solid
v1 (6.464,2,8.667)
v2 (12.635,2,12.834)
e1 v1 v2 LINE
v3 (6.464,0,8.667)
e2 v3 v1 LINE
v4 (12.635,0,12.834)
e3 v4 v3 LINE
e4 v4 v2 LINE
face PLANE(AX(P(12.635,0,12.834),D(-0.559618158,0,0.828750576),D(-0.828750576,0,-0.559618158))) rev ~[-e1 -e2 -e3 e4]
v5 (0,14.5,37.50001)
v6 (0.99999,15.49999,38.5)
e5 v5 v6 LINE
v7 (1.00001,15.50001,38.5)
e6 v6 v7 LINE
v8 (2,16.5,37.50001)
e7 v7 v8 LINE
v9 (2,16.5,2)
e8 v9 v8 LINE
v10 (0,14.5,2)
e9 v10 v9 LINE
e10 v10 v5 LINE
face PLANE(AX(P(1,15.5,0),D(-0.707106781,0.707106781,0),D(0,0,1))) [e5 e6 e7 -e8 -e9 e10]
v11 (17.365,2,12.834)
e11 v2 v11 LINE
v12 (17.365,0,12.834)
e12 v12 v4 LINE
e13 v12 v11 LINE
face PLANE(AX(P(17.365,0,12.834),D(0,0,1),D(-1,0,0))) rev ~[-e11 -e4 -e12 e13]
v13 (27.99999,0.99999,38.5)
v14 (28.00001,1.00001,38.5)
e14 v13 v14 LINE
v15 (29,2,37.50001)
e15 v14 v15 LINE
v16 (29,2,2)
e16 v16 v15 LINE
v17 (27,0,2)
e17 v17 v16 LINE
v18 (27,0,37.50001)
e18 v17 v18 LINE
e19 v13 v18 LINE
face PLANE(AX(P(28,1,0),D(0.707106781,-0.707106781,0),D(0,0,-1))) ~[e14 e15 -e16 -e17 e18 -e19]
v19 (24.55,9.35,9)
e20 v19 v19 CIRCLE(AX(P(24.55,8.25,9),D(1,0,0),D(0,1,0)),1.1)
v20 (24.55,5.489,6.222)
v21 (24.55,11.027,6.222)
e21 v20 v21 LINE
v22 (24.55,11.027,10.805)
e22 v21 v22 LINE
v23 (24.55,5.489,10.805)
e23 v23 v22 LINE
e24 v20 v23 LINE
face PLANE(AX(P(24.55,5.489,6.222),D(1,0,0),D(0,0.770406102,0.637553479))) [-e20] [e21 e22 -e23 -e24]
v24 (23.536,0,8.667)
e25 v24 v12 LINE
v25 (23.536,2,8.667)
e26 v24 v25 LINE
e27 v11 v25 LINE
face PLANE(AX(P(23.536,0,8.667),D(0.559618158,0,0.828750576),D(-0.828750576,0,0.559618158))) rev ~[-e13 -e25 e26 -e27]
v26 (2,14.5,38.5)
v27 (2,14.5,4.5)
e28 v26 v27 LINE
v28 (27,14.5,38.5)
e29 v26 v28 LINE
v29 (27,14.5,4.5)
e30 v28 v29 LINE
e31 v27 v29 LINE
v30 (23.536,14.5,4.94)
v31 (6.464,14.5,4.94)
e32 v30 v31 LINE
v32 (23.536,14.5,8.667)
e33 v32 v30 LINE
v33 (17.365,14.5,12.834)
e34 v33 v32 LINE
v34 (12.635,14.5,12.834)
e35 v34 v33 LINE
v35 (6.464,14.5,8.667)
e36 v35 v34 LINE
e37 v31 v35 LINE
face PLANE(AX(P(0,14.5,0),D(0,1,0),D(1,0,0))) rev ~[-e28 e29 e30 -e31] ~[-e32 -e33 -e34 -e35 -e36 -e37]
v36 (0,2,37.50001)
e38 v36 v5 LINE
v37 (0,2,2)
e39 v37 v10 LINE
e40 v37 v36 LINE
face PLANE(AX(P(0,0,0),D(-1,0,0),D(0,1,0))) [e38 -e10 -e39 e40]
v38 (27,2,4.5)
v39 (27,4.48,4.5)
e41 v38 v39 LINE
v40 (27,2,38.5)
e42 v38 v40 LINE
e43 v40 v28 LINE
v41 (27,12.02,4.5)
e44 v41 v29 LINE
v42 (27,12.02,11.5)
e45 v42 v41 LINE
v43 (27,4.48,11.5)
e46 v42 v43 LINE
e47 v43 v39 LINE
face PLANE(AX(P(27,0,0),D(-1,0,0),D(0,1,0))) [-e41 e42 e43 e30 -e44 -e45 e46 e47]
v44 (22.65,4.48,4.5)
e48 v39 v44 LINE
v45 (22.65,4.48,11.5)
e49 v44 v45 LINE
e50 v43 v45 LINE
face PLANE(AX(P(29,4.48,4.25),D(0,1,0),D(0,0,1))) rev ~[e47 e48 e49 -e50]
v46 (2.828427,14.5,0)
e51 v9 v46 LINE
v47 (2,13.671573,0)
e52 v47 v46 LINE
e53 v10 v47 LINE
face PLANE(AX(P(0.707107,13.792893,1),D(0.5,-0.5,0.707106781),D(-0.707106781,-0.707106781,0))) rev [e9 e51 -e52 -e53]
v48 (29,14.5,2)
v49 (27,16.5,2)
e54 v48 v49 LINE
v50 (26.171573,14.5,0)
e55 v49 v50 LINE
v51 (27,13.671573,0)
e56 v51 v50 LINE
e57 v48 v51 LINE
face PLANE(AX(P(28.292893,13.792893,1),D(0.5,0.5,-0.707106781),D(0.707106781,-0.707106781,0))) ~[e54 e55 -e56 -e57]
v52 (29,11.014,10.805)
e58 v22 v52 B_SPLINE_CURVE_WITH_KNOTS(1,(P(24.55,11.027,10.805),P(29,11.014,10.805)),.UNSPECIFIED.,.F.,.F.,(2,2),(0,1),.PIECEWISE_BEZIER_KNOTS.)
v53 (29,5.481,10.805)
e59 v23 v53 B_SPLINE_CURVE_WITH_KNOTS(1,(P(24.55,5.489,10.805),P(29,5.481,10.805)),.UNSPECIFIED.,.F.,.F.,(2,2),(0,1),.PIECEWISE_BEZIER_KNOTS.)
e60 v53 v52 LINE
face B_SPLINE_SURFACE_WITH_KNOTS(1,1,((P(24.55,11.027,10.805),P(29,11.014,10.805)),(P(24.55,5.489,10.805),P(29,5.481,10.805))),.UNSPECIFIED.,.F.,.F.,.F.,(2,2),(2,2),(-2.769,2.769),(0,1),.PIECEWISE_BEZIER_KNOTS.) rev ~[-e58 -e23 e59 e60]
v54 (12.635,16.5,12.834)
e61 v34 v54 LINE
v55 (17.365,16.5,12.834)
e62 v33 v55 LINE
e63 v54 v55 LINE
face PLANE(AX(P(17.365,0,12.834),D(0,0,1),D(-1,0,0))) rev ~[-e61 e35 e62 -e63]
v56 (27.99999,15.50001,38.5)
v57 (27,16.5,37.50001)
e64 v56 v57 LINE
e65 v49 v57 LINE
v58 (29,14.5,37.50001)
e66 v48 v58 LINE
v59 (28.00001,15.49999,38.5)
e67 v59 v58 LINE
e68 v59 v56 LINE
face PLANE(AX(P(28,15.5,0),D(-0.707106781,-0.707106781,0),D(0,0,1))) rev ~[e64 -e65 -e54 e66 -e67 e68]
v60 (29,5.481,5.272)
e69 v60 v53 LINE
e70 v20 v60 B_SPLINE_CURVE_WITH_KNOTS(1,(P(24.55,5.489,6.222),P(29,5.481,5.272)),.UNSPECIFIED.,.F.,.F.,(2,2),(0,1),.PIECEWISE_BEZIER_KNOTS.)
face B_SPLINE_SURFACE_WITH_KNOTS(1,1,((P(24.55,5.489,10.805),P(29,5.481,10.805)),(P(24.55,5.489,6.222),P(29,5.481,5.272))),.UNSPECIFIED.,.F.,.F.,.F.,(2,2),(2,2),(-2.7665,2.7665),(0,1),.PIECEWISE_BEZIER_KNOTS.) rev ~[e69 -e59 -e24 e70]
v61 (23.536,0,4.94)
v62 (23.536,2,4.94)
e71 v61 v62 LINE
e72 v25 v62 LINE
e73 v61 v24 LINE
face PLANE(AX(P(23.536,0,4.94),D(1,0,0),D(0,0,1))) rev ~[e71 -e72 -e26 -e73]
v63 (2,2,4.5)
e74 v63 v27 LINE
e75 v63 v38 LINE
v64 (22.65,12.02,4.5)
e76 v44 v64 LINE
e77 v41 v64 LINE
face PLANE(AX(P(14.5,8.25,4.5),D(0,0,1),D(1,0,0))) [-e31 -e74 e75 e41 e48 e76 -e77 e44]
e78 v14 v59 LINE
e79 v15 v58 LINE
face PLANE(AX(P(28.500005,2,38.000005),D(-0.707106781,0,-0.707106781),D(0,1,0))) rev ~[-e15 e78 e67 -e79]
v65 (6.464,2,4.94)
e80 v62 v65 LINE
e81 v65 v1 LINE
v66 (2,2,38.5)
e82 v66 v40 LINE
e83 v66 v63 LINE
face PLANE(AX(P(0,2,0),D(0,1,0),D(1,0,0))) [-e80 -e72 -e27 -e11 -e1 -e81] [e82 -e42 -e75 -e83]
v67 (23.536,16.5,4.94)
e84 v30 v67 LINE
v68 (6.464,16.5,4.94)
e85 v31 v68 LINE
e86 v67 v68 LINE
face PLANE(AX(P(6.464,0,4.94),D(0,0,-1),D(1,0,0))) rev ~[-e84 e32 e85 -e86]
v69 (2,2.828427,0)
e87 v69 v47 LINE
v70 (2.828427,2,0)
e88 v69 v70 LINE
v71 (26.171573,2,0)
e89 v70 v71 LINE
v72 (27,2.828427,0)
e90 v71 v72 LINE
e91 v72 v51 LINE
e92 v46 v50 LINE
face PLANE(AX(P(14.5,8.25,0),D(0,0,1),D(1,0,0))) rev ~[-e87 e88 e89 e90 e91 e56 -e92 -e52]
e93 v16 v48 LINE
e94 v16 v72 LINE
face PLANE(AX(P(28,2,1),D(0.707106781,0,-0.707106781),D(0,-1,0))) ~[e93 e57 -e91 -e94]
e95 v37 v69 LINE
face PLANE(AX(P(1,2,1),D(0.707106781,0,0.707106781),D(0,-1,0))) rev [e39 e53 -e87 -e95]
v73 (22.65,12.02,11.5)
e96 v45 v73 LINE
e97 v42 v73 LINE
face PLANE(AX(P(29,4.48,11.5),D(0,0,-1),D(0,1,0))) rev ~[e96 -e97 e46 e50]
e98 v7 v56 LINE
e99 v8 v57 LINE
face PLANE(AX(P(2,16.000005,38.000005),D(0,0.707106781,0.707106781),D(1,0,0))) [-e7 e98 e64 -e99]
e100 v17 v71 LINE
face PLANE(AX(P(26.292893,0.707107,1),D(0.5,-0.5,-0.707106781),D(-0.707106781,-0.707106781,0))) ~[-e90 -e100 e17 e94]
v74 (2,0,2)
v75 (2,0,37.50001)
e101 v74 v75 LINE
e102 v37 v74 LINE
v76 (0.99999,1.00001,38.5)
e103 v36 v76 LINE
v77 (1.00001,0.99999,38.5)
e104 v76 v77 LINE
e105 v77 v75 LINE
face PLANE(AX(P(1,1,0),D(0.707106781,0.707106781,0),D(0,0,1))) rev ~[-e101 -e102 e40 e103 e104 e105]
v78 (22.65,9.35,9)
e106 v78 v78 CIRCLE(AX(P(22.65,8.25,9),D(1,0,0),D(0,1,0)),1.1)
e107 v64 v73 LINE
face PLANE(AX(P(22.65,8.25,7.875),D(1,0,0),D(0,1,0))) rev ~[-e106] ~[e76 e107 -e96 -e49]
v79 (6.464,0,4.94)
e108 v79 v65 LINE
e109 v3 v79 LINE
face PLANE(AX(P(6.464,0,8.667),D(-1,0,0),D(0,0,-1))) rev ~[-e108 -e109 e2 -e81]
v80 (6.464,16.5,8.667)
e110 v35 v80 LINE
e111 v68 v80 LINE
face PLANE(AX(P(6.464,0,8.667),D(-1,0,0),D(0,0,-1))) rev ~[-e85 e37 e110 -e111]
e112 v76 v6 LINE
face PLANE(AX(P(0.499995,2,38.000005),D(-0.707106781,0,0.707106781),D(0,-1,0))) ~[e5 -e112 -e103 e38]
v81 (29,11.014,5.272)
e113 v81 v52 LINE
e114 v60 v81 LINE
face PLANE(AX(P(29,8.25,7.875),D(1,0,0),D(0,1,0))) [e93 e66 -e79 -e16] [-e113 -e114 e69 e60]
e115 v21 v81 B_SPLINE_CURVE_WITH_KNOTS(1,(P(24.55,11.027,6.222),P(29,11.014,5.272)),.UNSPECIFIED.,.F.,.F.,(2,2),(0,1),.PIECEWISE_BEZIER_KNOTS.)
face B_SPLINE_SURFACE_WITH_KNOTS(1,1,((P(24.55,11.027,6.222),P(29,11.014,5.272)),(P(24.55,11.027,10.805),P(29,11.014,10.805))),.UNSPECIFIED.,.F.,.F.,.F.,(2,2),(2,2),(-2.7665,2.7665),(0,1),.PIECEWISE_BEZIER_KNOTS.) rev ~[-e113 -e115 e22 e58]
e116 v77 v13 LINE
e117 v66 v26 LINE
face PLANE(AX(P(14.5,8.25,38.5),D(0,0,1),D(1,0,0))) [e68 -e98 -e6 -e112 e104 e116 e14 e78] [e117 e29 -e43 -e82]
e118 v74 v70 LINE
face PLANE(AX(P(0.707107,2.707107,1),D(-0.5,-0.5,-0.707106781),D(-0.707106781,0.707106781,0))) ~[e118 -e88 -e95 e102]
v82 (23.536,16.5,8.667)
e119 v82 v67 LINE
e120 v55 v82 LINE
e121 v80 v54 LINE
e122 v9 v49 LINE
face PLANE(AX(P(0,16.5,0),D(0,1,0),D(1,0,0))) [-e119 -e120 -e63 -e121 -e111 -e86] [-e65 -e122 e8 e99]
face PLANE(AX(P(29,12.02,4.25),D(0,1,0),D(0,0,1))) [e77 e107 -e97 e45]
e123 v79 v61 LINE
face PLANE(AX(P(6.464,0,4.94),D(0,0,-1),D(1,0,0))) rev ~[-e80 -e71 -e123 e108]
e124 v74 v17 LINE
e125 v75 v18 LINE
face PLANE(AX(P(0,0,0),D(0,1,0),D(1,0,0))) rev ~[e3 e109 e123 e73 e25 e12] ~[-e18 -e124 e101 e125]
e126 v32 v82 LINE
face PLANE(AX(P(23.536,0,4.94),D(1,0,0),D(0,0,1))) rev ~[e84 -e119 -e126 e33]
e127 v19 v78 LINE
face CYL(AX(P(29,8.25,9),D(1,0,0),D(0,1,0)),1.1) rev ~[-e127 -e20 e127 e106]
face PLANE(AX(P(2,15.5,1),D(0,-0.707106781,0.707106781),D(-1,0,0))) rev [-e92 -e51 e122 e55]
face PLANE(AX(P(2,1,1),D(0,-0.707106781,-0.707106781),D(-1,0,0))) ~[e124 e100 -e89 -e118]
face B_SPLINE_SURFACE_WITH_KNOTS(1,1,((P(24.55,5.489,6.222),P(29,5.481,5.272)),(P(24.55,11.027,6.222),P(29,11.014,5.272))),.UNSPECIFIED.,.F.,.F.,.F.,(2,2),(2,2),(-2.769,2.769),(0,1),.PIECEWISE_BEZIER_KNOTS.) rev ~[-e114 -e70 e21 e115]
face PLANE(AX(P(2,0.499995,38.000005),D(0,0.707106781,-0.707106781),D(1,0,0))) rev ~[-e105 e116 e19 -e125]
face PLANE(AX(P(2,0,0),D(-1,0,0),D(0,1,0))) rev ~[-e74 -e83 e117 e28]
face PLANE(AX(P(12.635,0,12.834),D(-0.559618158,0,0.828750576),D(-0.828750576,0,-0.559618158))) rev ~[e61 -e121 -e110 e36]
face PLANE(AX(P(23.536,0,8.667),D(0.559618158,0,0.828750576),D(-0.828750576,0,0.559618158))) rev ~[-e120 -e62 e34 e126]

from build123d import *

# Parameters (mm, degrees)
F0_W      = 29
F0_H      = 16.5
F1_DEPTH  = 38.5
F2_T      = -2
F3_DEPTH  = 2.5
F4_SIZE   = 2
F5_SIZE   = 2
F6_SIZE   = 0.99999
F8_DEPTH  = 16.501
F9_W      = 7.54
F9_H      = 7.25
F9_R      = 1.1
F10_DEPTH = 6.35
F13_W     = 5.538
F13_H     = 4.583
F11_W     = 5.533
F11_H     = 5.533


# Not quite as in the source:
# - a fillet or chamfer is up to 0.001 mm smaller than in the source, because OpenCascade refuses the exact size


with BuildPart() as f1:
    # F0 (on Top) → F1 (new body)
    with BuildSketch(Plane.XY):
        with Locations((14.5, 8.25)):
            Rectangle(F0_W, F0_H)
    extrude(amount=F1_DEPTH)

    # F2
    f2_openings = [f1.faces().sort_by_distance(p)[0] for p in [
        (14.5, 8.25, 38.5),
    ]]
    offset(amount=F2_T, openings=f2_openings)

    # F3 (add): a face of the model
    f3_faces = [f1.faces().sort_by_distance(p)[0] for p in [
        (14.5, 8.25, 2),
    ]]
    extrude(f3_faces, amount=F3_DEPTH)

    # F4
    f4_edges = [f1.edges().sort_by_distance(p)[0] for p in [
        (29, 0, 19.25),
        (29, 16.5, 19.25),
        (0, 0, 19.25),
        (0, 16.5, 19.25),
    ]]
    chamfer(f4_edges, length=F4_SIZE)

    # F5
    f5_edges = [f1.edges().sort_by_distance(p)[0] for p in [
        (0, 8.25, 0),
        (1, 15.5, 0),
        (1, 1, 0),
        (14.5, 16.5, 0),
        (14.5, 0, 0),
        (28, 15.5, 0),
        (28, 1, 0),
        (29, 8.25, 0),
    ]]
    chamfer(f5_edges, length=F5_SIZE)

    # F6 (size 1 in the source; OpenCascade refuses exactly that, so slightly less here)
    f6_edges = [f1.edges().sort_by_distance(p)[0] for p in [
        (14.5, 16.5, 38.5),
        (0, 8.25, 38.5),
        (14.5, 0, 38.5),
        (29, 8.25, 38.5),
    ]]
    chamfer(f6_edges, length=F6_SIZE)

    # F7 (on face) → F8 (cut, through all)
    with BuildSketch(Plane.XZ):
        Polygon((12.635, 12.834), (6.464, 8.667), (6.464, 4.94), (23.536, 4.94), (23.536, 8.667), (17.365, 12.834), align=None)
    extrude(amount=-F8_DEPTH, mode=Mode.SUBTRACT)

    # F9 (on face) → F10 (join)
    with BuildSketch(Plane.YZ.offset(29)):
        with Locations((8.25, 7.875)):
            Rectangle(F9_W, F9_H)
        with Locations((8.25, 9)):
            Circle(F9_R, mode=Mode.SUBTRACT)
    extrude(amount=-F10_DEPTH)

    # F13 (on offset) → F14 section 0
    with BuildSketch(Plane.YZ.offset(24.55)):
        with Locations((8.258, 8.5135)):
            Rectangle(F13_W, F13_H)
    # F11 (on face) → F14 section 1
    with BuildSketch(Plane.YZ.offset(29)):
        with Locations((8.2475, 8.0385)):
            Rectangle(F11_W, F11_H)
    loft(mode=Mode.SUBTRACT)


solid = f1.part
